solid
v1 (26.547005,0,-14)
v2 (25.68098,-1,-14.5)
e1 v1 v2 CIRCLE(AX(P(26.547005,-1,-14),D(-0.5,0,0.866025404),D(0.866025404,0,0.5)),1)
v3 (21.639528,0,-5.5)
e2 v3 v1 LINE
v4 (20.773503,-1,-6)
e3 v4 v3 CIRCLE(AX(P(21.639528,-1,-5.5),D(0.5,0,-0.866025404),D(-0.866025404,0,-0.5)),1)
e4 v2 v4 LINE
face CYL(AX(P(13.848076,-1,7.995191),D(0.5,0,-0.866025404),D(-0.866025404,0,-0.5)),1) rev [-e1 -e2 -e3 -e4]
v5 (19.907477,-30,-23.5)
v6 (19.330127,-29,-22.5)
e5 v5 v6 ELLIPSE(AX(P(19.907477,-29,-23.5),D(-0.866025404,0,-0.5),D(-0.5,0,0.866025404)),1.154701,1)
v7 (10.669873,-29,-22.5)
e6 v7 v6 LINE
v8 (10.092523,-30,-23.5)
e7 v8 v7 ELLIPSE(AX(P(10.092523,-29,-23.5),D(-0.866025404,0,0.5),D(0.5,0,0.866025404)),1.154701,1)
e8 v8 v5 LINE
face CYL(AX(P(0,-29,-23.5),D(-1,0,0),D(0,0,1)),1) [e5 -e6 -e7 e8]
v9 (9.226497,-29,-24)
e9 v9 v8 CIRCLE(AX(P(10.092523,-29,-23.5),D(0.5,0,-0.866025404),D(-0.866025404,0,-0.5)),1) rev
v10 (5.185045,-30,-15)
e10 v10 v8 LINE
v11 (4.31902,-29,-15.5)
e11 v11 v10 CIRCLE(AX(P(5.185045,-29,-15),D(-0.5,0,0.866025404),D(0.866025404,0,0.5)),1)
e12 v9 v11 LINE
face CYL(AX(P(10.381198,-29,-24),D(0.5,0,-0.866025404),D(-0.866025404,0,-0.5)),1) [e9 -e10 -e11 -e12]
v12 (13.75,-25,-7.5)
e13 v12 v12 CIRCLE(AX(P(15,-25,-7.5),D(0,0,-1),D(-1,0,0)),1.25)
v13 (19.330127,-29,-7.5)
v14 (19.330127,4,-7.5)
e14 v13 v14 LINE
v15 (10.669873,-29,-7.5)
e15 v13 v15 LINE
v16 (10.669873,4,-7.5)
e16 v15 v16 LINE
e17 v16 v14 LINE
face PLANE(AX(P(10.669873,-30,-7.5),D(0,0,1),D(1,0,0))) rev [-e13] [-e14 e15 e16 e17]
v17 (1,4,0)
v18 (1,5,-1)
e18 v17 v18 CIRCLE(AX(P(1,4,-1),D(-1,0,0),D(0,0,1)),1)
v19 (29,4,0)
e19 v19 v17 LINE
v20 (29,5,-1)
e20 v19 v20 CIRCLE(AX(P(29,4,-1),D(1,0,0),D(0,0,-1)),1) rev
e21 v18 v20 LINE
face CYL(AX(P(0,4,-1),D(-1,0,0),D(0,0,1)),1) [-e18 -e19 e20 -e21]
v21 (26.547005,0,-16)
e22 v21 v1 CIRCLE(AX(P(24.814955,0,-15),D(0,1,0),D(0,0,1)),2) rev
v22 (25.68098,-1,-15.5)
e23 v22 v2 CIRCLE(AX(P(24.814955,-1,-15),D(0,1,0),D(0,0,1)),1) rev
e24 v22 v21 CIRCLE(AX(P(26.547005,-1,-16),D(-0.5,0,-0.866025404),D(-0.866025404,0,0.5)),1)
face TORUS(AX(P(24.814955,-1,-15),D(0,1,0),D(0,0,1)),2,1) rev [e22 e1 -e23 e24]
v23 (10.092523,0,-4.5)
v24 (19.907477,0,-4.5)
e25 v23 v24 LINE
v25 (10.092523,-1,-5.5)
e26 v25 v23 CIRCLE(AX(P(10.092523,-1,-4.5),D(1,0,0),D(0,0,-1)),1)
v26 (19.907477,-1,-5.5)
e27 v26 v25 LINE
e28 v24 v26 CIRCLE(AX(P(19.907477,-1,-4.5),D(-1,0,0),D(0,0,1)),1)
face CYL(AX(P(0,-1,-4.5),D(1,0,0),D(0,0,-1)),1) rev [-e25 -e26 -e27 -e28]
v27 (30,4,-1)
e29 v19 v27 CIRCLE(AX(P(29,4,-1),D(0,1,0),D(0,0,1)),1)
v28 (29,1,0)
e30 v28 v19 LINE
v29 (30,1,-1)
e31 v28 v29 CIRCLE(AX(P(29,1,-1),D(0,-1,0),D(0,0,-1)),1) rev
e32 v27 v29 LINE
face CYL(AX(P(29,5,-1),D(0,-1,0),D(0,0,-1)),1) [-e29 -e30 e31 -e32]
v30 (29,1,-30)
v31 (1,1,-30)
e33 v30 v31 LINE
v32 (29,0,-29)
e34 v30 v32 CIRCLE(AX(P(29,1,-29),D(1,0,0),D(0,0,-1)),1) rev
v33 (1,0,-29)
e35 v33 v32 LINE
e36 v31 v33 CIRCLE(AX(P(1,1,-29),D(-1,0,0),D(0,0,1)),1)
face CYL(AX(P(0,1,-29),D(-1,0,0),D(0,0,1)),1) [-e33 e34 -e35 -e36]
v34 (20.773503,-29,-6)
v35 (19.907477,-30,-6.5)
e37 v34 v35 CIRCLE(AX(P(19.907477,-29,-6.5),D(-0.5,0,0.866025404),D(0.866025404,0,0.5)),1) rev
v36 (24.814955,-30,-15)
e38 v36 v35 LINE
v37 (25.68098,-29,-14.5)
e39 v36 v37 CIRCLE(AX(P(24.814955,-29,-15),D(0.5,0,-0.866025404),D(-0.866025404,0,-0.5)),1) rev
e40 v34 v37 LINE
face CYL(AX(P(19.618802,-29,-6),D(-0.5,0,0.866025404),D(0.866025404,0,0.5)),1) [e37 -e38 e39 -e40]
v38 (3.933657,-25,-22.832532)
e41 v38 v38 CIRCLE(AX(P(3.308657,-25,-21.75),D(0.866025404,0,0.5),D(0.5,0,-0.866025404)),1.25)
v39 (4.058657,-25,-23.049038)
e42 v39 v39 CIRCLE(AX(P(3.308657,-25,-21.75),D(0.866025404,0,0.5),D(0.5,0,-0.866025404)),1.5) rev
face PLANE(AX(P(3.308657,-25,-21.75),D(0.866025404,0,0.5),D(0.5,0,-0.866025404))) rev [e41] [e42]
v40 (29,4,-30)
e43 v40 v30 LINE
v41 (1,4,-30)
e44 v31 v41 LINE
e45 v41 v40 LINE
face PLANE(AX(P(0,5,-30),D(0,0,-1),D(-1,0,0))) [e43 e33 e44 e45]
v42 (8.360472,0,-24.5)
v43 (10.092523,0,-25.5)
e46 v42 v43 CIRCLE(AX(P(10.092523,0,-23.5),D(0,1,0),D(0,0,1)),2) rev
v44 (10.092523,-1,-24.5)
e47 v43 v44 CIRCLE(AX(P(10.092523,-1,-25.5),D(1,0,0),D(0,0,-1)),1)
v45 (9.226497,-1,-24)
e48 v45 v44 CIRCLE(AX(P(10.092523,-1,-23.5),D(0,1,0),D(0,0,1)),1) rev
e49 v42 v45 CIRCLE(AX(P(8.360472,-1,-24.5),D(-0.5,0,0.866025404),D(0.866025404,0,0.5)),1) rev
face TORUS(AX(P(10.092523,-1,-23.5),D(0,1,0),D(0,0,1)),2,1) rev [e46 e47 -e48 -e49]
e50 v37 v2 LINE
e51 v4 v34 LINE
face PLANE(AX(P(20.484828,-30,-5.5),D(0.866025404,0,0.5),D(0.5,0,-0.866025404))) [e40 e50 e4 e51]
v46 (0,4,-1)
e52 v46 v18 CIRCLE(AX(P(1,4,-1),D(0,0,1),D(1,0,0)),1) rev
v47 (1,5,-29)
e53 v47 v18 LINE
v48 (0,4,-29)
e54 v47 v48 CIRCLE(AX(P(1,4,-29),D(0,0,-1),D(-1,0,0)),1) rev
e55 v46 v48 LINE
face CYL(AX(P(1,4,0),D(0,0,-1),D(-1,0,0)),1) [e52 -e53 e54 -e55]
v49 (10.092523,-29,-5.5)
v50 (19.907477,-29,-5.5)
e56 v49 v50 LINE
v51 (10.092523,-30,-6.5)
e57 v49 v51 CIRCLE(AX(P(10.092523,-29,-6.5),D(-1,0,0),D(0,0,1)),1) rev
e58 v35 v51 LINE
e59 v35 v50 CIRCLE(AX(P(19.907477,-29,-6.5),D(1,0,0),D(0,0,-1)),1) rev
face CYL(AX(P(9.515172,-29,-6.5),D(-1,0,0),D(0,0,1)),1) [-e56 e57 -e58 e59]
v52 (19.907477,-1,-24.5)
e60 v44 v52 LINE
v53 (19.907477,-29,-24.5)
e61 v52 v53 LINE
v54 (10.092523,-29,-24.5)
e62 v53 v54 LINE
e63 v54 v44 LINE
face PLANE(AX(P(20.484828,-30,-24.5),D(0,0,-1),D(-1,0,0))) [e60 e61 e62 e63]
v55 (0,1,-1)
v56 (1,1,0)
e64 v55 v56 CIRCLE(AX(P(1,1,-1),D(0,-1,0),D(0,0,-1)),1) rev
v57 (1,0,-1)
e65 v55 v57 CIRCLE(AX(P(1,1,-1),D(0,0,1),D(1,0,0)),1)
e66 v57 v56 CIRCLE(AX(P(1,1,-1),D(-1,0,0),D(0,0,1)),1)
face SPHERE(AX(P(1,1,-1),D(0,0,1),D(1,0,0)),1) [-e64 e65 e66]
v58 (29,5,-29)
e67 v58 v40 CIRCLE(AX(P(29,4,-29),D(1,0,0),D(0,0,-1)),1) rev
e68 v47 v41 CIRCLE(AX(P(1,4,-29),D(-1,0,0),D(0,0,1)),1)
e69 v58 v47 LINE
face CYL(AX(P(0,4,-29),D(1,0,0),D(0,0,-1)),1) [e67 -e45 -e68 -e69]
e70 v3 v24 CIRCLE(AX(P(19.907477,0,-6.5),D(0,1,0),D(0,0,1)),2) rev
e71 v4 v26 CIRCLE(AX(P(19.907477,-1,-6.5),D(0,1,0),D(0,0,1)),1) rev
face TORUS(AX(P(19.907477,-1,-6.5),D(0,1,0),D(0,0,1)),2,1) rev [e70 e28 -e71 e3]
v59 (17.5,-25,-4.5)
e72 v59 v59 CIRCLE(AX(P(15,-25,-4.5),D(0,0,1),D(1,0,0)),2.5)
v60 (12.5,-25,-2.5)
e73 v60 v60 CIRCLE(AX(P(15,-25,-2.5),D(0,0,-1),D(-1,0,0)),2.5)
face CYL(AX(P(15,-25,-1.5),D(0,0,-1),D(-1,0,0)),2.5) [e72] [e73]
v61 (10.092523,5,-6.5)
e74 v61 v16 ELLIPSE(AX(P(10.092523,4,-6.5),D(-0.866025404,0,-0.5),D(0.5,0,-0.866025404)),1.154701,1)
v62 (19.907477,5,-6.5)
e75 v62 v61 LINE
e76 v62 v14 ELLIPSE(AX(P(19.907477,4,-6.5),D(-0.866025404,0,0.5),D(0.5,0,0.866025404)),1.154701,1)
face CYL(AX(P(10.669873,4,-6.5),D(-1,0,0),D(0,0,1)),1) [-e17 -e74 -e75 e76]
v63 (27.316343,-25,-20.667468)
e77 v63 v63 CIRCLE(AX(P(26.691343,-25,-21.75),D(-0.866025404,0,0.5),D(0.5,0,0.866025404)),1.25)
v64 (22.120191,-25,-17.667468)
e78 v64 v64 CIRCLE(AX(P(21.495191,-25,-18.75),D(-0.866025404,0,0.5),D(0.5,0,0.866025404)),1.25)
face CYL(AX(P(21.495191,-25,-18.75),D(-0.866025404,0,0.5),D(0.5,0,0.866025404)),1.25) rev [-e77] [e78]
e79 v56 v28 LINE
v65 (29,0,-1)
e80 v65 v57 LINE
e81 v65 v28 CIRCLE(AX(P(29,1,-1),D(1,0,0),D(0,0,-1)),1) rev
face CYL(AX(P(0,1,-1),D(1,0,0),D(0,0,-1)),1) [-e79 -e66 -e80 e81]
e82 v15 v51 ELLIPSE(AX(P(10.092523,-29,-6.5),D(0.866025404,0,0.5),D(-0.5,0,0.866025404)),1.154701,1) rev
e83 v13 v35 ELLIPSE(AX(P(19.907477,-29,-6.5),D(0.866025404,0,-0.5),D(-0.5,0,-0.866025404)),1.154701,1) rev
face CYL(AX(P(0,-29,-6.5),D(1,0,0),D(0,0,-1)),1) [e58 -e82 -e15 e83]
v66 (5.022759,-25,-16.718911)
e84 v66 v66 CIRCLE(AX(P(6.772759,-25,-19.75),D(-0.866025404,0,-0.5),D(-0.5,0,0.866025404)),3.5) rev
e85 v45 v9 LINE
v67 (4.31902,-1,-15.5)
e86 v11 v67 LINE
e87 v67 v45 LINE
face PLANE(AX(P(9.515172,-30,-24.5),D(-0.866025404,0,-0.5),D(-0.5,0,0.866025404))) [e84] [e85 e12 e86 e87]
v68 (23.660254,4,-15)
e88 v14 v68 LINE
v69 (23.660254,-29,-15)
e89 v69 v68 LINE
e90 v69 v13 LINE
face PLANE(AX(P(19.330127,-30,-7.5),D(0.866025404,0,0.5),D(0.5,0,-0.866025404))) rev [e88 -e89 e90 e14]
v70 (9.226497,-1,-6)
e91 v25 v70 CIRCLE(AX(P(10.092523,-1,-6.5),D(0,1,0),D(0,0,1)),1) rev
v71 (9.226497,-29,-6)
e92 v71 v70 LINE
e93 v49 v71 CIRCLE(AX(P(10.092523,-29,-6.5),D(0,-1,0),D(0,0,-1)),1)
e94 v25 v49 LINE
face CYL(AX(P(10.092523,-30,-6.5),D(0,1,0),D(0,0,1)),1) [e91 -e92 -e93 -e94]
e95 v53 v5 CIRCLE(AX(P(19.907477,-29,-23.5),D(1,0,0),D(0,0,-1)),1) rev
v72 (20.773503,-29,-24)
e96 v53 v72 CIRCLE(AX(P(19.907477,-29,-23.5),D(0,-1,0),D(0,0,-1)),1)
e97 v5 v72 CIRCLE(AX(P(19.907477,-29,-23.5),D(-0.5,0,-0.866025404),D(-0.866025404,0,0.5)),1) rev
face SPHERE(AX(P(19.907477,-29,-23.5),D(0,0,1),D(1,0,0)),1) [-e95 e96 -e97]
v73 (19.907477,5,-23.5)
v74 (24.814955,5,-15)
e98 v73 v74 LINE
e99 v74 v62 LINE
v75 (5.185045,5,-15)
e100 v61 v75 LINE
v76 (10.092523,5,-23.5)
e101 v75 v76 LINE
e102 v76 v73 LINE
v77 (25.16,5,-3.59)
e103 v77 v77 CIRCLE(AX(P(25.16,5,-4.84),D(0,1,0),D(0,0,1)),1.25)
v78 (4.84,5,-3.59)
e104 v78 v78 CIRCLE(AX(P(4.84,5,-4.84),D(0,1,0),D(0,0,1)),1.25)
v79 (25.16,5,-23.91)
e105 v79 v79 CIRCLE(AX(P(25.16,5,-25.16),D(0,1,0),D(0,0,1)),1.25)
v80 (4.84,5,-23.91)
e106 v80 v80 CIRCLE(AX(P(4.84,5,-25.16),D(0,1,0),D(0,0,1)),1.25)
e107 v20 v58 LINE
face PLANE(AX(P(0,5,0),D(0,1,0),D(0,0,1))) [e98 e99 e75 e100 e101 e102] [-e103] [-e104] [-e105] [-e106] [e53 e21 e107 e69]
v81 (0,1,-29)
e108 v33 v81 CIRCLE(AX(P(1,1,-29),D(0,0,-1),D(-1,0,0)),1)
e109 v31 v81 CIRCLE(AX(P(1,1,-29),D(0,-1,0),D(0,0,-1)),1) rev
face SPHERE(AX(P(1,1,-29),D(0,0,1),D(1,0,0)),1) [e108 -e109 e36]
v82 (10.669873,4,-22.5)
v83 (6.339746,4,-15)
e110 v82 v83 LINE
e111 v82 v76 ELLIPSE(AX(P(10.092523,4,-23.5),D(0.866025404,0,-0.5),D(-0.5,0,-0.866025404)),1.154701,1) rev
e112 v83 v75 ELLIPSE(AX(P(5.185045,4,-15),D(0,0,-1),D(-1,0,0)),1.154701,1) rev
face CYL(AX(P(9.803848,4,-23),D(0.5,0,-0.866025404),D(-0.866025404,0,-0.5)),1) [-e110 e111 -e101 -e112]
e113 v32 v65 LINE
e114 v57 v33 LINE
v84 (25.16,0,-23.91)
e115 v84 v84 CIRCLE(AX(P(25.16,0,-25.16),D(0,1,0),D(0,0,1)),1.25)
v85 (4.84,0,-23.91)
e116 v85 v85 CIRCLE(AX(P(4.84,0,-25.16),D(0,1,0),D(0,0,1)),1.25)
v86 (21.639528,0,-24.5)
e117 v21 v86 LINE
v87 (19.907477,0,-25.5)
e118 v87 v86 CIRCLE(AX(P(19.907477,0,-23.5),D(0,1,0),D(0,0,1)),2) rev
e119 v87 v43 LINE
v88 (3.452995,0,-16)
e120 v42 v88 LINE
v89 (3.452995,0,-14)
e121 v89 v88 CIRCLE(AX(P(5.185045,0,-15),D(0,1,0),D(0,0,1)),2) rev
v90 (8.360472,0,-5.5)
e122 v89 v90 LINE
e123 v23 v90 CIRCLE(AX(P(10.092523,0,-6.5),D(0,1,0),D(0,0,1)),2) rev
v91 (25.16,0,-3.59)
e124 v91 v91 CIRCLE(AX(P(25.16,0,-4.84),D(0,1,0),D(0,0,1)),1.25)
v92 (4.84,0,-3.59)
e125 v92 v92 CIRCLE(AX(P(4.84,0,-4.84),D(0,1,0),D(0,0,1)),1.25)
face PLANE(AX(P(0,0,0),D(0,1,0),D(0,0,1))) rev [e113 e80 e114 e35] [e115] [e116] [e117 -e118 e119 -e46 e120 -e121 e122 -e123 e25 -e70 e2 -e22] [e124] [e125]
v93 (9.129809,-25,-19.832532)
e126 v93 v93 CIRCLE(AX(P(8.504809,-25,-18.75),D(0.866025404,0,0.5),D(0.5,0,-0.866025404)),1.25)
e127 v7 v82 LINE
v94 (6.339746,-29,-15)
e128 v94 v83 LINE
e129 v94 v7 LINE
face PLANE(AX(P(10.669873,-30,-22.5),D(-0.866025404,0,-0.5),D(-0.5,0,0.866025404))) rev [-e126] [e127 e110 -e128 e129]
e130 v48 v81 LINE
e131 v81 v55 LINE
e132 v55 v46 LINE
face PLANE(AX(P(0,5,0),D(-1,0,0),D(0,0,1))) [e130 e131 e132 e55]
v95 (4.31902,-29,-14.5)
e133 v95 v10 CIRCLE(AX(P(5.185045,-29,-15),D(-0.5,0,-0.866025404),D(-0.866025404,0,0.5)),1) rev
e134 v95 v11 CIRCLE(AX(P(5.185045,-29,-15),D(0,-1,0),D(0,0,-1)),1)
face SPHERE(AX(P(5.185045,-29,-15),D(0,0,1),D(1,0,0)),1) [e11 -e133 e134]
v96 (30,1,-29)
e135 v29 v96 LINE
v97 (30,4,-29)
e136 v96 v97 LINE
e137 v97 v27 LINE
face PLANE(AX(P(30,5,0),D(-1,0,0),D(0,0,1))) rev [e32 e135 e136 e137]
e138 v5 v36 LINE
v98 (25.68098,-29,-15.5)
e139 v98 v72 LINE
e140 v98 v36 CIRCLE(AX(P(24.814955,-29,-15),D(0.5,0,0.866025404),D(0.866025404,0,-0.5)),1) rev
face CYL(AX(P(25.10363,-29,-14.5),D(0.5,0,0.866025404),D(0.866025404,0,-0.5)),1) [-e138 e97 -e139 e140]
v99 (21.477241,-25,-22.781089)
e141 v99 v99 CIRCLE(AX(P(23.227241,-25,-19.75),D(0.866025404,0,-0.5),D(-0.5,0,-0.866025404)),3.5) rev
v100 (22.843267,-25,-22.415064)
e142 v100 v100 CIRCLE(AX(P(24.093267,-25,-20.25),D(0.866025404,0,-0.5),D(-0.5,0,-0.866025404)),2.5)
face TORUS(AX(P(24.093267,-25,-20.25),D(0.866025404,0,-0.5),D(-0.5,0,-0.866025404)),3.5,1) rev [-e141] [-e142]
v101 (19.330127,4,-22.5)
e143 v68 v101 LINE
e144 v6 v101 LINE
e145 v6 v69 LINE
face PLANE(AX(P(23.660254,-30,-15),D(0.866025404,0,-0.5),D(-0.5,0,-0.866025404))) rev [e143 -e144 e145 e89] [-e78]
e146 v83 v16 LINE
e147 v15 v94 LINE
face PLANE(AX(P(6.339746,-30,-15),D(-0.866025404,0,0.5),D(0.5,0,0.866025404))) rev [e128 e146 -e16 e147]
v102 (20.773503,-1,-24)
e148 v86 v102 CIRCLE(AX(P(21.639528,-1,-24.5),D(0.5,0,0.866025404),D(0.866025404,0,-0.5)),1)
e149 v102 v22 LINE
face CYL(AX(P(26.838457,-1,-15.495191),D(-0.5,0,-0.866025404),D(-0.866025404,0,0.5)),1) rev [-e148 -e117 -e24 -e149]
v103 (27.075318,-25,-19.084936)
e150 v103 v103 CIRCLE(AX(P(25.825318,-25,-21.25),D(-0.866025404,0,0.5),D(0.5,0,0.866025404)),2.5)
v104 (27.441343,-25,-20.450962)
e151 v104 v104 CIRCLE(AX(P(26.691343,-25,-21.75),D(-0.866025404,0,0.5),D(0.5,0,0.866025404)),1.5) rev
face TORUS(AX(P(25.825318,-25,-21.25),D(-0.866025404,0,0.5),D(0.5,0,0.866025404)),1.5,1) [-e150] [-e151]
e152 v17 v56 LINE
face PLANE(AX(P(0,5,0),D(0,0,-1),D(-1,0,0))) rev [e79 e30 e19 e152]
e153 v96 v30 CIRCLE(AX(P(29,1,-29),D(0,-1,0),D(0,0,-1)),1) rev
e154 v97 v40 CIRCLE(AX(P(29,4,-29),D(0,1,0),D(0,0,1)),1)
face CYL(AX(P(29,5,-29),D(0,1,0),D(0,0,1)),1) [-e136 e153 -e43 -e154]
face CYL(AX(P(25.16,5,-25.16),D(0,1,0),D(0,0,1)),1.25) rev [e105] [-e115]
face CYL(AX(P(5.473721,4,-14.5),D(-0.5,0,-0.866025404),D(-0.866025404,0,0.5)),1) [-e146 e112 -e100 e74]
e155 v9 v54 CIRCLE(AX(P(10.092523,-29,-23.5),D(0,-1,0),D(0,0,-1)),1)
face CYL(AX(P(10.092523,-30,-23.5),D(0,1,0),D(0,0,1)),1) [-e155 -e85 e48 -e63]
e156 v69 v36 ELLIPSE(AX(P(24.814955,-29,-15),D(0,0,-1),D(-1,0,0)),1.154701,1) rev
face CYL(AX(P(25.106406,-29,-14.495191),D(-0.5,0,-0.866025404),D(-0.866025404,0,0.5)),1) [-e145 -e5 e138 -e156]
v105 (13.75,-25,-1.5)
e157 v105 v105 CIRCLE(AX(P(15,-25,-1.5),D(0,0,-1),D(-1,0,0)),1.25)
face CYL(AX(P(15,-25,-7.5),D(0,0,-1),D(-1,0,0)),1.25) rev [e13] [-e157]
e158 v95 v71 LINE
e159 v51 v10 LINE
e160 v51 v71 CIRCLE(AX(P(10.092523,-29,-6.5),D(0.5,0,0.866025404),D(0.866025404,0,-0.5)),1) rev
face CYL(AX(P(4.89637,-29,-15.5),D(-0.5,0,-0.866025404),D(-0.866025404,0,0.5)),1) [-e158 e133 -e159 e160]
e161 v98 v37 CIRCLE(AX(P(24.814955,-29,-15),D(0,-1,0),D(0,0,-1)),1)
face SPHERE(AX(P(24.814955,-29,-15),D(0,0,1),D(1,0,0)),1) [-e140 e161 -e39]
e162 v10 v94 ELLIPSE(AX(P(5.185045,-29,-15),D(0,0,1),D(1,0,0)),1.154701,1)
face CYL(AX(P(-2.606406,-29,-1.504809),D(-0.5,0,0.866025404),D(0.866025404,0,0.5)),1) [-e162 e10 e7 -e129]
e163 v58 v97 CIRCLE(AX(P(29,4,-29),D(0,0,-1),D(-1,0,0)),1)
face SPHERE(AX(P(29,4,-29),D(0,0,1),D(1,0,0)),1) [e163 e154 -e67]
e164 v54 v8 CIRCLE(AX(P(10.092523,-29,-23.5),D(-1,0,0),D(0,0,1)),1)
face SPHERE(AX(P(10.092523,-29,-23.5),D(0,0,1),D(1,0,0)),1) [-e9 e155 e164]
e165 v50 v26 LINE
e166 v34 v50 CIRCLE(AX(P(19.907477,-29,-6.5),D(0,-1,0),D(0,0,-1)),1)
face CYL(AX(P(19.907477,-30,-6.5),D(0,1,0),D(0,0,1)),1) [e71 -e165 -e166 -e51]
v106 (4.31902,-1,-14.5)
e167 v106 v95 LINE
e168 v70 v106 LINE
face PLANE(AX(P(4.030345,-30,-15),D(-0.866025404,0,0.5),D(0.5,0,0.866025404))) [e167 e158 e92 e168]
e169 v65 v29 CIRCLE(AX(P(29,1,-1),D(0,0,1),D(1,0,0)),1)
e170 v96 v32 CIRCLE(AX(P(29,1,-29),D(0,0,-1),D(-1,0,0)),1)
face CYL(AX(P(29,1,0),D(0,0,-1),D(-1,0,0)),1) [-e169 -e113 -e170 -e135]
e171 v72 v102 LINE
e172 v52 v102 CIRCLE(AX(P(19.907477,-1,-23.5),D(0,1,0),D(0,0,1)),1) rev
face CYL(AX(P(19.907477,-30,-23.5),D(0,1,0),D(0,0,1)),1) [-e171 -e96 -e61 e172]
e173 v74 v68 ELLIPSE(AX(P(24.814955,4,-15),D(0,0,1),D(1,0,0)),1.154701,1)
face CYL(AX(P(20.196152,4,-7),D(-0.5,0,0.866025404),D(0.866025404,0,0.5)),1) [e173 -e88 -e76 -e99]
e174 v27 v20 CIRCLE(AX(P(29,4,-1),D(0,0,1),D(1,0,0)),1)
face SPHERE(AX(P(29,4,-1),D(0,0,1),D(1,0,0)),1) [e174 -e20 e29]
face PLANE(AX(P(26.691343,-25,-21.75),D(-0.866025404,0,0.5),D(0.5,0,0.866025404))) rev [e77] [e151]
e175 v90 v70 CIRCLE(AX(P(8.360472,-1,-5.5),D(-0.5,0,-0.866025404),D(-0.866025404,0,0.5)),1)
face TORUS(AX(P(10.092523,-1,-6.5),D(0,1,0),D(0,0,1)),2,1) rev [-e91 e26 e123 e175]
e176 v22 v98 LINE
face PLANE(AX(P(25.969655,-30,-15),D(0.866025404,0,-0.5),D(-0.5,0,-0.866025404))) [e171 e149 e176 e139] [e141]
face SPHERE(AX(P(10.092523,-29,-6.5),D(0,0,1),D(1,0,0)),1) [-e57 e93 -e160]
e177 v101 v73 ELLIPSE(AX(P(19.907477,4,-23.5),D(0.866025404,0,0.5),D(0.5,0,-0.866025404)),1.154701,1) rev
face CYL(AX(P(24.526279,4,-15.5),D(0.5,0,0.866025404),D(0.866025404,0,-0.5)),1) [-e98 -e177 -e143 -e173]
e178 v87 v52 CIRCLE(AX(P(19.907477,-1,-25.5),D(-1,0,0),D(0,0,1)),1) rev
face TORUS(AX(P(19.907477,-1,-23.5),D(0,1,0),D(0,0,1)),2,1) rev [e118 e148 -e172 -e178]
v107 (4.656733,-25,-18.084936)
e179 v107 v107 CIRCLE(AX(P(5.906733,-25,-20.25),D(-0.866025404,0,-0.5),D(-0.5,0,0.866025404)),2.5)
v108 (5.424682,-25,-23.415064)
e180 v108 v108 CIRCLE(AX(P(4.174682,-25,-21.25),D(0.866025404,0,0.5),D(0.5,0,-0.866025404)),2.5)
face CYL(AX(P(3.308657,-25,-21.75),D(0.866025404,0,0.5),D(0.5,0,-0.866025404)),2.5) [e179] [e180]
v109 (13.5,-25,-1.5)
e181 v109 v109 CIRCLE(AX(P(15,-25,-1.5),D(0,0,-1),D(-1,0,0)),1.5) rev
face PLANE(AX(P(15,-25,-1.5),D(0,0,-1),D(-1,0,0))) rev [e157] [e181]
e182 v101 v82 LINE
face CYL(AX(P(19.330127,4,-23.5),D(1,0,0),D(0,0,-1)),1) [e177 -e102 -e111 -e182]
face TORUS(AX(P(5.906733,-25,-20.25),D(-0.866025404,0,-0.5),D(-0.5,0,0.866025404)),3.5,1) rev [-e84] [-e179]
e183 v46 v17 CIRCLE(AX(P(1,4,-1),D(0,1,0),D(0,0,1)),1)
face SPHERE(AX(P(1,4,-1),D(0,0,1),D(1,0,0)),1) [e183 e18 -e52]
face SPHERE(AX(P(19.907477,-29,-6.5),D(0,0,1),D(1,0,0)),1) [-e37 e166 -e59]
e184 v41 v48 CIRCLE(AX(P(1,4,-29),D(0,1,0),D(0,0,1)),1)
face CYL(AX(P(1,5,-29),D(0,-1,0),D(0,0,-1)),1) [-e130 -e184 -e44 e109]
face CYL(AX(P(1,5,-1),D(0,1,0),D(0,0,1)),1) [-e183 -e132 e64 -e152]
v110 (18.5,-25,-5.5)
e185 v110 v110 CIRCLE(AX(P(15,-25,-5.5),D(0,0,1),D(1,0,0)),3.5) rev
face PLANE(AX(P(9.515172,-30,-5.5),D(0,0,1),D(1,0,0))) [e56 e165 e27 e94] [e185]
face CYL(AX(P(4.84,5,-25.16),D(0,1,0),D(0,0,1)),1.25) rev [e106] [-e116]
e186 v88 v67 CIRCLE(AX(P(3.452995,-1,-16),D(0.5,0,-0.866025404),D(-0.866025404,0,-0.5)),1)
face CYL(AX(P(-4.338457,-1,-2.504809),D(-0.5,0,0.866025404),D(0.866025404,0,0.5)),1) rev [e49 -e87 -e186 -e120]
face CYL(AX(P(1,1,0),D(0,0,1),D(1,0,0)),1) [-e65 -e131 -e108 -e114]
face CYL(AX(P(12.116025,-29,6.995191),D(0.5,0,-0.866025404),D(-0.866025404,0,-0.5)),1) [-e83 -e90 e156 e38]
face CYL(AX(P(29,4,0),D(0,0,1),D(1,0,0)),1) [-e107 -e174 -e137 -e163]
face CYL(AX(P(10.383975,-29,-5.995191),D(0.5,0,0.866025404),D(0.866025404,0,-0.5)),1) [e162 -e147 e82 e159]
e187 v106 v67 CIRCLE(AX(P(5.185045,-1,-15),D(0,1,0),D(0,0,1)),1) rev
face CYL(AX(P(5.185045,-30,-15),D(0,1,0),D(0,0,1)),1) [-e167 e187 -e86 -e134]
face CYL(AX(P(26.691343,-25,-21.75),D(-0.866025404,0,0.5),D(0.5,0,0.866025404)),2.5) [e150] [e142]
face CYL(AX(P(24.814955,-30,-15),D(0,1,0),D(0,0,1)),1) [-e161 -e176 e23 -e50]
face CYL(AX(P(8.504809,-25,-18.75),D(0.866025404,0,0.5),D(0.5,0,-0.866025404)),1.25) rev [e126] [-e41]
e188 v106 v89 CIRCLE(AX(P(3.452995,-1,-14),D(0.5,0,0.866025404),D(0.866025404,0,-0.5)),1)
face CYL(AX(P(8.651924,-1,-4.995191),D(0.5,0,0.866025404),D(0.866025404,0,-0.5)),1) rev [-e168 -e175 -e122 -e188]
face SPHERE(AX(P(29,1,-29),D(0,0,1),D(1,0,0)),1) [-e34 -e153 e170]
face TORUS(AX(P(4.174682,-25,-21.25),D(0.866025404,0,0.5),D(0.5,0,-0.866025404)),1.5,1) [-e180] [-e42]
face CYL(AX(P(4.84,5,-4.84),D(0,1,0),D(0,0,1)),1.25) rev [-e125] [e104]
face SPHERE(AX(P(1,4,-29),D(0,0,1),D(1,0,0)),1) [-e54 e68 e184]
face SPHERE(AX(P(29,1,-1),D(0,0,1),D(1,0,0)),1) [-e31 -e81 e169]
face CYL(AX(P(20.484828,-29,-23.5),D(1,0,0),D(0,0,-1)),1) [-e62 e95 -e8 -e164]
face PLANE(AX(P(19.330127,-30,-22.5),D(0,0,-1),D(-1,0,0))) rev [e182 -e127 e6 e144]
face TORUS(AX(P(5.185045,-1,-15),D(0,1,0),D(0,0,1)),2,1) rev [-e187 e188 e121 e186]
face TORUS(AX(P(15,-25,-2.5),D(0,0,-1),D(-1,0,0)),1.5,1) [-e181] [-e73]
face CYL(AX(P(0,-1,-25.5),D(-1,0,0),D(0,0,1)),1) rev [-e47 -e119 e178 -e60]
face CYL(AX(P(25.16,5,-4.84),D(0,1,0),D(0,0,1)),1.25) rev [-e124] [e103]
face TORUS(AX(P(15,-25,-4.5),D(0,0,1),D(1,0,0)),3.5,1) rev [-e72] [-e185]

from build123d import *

# Parameters (mm, degrees)
SKETCH1_W            = 30
SKETCH1_H            = 30
BODY_DEPTH           = 5
SHAFT_DEPTH          = 35
SHAFTHOLE_DEPTH      = 56
SKETCH5_R            = 2.5
MOUNTSHELL_DEPTH     = 6
MOUNTHOLE_D          = 2.5
MOUNTHOLE_DEPTH      = 8.166429535
CIRPATTERN1_COUNT    = 3
MOUNTINGHOLES_D      = 2.5
LPATTERN1_COUNT      = 2
LPATTERN1_PITCH      = 20.32
LPATTERN1_COUNT_DIR2 = 2
LPATTERN1_PITCH_DIR2 = 20.32
FILLET1_R            = 1


with BuildPart() as part:
    # Sketch1 → Body (new body)
    with BuildSketch(Plane(origin=(0, 0, 0), x_dir=(1, 0, 0), z_dir=(0, 1, 0))):
        with Locations((15, 15)):
            Rectangle(SKETCH1_W, SKETCH1_H)
    extrude(amount=BODY_DEPTH)

    # Sketch2 → Shaft (add)
    with BuildSketch(Plane(origin=(0, 5, 0), x_dir=(1, 0, 0), z_dir=(0, 1, 0))):
        Polygon((25.969655115, 15), (20.484827557, 24.5), (9.515172443, 24.5), (4.030344885, 15), (9.515172443, 5.5), (20.484827557, 5.5), align=None)
    extrude(amount=-SHAFT_DEPTH)

    # Sketch3 → ShaftHole (cut, through all)
    with BuildSketch(Plane(origin=(0, 5, 0), x_dir=(1, 0, 0), z_dir=(0, 1, 0))):
        Polygon((23.660254038, 15), (19.330127019, 22.5), (10.669872981, 22.5), (6.339745962, 15), (10.669872981, 7.5), (19.330127019, 7.5), align=None)
    extrude(amount=-SHAFTHOLE_DEPTH, mode=Mode.SUBTRACT)

    # Sketch5 → MountShell (add)
    with BuildSketch(Plane(origin=(-1.740381057, 0, -1.004809472), x_dir=(0.5000000000000001, 0, -0.8660254037844386), z_dir=(0.8660254037844386, 0, 0.5000000000000001))):
        with Locations((20.490381057, -25)):
            Circle(SKETCH5_R)
    mountshell = extrude(amount=-MOUNTSHELL_DEPTH)

    # MountHole
    with Locations(Plane(origin=(8.504809472, -25, -18.75), x_dir=(-0.5, 0, 0.866025403784), z_dir=(0.866025403784, 0, 0.5))):
        with Locations((0, 0)):
            mounthole = Hole(MOUNTHOLE_D / 2, depth=MOUNTHOLE_DEPTH)

    # CirPattern1: MountShell, MountHole ×3 about axis
    cirpattern1_axis = Axis((15, 0, -15), (0, 1, 0))
    add([mountshell.rotate(cirpattern1_axis, i * 360 / CIRPATTERN1_COUNT) for i in range(1, CIRPATTERN1_COUNT)])
    add([mounthole.rotate(cirpattern1_axis, i * 360 / CIRPATTERN1_COUNT) for i in range(1, CIRPATTERN1_COUNT)], mode=Mode.SUBTRACT)

    # MountingHoles (through all)
    with Locations(Plane(origin=(4.84, 5, -25.16), x_dir=(0, 0, 1), z_dir=(0, 1, 0))):
        with Locations((0, 0)):
            mountingholes = Hole(MOUNTINGHOLES_D / 2)

    # LPattern1: MountingHoles 2 × 2
    with Locations(*[(j * LPATTERN1_PITCH_DIR2, 0, i * LPATTERN1_PITCH) for i in range(LPATTERN1_COUNT) for j in range(LPATTERN1_COUNT_DIR2) if (i, j) != (0, 0)]):
        add(mountingholes, mode=Mode.SUBTRACT)

    # Fillet1
    fillet1_edges = [part.edges().sort_by_distance(p)[0] for p in [
        (15, 5, -30),
        (0, 5, -15),
        (15, 0, -24.5),
        (6.772758664, 0, -19.75),
        (6.772758664, 0, -10.25),
        (15, 0, -5.5),
        (23.227241336, 0, -10.25),
        (23.227241336, 0, -19.75),
        (23.227241336, -30, -19.75),
        (20.484827557, -15, -24.5),
        (23.227241336, -30, -10.25),
        (25.969655115, -15, -15),
        (15, -30, -5.5),
        (20.484827557, -15, -5.5),
        (6.772758664, -30, -10.25),
        (9.515172443, -15, -5.5),
        (6.772758664, -30, -19.75),
        (4.030344885, -15, -15),
        (15, -30, -24.5),
        (9.515172443, -15, -24.5),
        (15, 5, 0),
        (0, 0, -15),
        (21.495190528, -30, -11.25),
        (15, -30, -7.5),
        (8.504809472, -30, -11.25),
        (8.504809472, -30, -18.75),
        (15, -30, -22.5),
        (21.495190528, -30, -18.75),
        (21.495190528, 5, -11.25),
        (21.495190528, 5, -18.75),
        (15, 5, -22.5),
        (8.504809472, 5, -18.75),
        (8.504809472, 5, -11.25),
        (15, 0, -30),
        (15, 5, -7.5),
        (30, 0, -15),
        (15, 0, 0),
        (5.522758664, -25, -17.584936491),
        (2.058657049, -25, -19.584936491),
        (30, 5, -15),
        (0, 2.5, 0),
        (17.5, -25, -5.5),
        (0, 2.5, -30),
        (17.5, -25, -1.5),
        (30, 2.5, -30),
        (30, 2.5, 0),
        (21.977241336, -25, -21.915063509),
        (25.441342951, -25, -23.915063509),
    ]]
    fillet(fillet1_edges, radius=FILLET1_R - 0.0001)  # a hair under: the kernel refuses the full size


solid = part.part
